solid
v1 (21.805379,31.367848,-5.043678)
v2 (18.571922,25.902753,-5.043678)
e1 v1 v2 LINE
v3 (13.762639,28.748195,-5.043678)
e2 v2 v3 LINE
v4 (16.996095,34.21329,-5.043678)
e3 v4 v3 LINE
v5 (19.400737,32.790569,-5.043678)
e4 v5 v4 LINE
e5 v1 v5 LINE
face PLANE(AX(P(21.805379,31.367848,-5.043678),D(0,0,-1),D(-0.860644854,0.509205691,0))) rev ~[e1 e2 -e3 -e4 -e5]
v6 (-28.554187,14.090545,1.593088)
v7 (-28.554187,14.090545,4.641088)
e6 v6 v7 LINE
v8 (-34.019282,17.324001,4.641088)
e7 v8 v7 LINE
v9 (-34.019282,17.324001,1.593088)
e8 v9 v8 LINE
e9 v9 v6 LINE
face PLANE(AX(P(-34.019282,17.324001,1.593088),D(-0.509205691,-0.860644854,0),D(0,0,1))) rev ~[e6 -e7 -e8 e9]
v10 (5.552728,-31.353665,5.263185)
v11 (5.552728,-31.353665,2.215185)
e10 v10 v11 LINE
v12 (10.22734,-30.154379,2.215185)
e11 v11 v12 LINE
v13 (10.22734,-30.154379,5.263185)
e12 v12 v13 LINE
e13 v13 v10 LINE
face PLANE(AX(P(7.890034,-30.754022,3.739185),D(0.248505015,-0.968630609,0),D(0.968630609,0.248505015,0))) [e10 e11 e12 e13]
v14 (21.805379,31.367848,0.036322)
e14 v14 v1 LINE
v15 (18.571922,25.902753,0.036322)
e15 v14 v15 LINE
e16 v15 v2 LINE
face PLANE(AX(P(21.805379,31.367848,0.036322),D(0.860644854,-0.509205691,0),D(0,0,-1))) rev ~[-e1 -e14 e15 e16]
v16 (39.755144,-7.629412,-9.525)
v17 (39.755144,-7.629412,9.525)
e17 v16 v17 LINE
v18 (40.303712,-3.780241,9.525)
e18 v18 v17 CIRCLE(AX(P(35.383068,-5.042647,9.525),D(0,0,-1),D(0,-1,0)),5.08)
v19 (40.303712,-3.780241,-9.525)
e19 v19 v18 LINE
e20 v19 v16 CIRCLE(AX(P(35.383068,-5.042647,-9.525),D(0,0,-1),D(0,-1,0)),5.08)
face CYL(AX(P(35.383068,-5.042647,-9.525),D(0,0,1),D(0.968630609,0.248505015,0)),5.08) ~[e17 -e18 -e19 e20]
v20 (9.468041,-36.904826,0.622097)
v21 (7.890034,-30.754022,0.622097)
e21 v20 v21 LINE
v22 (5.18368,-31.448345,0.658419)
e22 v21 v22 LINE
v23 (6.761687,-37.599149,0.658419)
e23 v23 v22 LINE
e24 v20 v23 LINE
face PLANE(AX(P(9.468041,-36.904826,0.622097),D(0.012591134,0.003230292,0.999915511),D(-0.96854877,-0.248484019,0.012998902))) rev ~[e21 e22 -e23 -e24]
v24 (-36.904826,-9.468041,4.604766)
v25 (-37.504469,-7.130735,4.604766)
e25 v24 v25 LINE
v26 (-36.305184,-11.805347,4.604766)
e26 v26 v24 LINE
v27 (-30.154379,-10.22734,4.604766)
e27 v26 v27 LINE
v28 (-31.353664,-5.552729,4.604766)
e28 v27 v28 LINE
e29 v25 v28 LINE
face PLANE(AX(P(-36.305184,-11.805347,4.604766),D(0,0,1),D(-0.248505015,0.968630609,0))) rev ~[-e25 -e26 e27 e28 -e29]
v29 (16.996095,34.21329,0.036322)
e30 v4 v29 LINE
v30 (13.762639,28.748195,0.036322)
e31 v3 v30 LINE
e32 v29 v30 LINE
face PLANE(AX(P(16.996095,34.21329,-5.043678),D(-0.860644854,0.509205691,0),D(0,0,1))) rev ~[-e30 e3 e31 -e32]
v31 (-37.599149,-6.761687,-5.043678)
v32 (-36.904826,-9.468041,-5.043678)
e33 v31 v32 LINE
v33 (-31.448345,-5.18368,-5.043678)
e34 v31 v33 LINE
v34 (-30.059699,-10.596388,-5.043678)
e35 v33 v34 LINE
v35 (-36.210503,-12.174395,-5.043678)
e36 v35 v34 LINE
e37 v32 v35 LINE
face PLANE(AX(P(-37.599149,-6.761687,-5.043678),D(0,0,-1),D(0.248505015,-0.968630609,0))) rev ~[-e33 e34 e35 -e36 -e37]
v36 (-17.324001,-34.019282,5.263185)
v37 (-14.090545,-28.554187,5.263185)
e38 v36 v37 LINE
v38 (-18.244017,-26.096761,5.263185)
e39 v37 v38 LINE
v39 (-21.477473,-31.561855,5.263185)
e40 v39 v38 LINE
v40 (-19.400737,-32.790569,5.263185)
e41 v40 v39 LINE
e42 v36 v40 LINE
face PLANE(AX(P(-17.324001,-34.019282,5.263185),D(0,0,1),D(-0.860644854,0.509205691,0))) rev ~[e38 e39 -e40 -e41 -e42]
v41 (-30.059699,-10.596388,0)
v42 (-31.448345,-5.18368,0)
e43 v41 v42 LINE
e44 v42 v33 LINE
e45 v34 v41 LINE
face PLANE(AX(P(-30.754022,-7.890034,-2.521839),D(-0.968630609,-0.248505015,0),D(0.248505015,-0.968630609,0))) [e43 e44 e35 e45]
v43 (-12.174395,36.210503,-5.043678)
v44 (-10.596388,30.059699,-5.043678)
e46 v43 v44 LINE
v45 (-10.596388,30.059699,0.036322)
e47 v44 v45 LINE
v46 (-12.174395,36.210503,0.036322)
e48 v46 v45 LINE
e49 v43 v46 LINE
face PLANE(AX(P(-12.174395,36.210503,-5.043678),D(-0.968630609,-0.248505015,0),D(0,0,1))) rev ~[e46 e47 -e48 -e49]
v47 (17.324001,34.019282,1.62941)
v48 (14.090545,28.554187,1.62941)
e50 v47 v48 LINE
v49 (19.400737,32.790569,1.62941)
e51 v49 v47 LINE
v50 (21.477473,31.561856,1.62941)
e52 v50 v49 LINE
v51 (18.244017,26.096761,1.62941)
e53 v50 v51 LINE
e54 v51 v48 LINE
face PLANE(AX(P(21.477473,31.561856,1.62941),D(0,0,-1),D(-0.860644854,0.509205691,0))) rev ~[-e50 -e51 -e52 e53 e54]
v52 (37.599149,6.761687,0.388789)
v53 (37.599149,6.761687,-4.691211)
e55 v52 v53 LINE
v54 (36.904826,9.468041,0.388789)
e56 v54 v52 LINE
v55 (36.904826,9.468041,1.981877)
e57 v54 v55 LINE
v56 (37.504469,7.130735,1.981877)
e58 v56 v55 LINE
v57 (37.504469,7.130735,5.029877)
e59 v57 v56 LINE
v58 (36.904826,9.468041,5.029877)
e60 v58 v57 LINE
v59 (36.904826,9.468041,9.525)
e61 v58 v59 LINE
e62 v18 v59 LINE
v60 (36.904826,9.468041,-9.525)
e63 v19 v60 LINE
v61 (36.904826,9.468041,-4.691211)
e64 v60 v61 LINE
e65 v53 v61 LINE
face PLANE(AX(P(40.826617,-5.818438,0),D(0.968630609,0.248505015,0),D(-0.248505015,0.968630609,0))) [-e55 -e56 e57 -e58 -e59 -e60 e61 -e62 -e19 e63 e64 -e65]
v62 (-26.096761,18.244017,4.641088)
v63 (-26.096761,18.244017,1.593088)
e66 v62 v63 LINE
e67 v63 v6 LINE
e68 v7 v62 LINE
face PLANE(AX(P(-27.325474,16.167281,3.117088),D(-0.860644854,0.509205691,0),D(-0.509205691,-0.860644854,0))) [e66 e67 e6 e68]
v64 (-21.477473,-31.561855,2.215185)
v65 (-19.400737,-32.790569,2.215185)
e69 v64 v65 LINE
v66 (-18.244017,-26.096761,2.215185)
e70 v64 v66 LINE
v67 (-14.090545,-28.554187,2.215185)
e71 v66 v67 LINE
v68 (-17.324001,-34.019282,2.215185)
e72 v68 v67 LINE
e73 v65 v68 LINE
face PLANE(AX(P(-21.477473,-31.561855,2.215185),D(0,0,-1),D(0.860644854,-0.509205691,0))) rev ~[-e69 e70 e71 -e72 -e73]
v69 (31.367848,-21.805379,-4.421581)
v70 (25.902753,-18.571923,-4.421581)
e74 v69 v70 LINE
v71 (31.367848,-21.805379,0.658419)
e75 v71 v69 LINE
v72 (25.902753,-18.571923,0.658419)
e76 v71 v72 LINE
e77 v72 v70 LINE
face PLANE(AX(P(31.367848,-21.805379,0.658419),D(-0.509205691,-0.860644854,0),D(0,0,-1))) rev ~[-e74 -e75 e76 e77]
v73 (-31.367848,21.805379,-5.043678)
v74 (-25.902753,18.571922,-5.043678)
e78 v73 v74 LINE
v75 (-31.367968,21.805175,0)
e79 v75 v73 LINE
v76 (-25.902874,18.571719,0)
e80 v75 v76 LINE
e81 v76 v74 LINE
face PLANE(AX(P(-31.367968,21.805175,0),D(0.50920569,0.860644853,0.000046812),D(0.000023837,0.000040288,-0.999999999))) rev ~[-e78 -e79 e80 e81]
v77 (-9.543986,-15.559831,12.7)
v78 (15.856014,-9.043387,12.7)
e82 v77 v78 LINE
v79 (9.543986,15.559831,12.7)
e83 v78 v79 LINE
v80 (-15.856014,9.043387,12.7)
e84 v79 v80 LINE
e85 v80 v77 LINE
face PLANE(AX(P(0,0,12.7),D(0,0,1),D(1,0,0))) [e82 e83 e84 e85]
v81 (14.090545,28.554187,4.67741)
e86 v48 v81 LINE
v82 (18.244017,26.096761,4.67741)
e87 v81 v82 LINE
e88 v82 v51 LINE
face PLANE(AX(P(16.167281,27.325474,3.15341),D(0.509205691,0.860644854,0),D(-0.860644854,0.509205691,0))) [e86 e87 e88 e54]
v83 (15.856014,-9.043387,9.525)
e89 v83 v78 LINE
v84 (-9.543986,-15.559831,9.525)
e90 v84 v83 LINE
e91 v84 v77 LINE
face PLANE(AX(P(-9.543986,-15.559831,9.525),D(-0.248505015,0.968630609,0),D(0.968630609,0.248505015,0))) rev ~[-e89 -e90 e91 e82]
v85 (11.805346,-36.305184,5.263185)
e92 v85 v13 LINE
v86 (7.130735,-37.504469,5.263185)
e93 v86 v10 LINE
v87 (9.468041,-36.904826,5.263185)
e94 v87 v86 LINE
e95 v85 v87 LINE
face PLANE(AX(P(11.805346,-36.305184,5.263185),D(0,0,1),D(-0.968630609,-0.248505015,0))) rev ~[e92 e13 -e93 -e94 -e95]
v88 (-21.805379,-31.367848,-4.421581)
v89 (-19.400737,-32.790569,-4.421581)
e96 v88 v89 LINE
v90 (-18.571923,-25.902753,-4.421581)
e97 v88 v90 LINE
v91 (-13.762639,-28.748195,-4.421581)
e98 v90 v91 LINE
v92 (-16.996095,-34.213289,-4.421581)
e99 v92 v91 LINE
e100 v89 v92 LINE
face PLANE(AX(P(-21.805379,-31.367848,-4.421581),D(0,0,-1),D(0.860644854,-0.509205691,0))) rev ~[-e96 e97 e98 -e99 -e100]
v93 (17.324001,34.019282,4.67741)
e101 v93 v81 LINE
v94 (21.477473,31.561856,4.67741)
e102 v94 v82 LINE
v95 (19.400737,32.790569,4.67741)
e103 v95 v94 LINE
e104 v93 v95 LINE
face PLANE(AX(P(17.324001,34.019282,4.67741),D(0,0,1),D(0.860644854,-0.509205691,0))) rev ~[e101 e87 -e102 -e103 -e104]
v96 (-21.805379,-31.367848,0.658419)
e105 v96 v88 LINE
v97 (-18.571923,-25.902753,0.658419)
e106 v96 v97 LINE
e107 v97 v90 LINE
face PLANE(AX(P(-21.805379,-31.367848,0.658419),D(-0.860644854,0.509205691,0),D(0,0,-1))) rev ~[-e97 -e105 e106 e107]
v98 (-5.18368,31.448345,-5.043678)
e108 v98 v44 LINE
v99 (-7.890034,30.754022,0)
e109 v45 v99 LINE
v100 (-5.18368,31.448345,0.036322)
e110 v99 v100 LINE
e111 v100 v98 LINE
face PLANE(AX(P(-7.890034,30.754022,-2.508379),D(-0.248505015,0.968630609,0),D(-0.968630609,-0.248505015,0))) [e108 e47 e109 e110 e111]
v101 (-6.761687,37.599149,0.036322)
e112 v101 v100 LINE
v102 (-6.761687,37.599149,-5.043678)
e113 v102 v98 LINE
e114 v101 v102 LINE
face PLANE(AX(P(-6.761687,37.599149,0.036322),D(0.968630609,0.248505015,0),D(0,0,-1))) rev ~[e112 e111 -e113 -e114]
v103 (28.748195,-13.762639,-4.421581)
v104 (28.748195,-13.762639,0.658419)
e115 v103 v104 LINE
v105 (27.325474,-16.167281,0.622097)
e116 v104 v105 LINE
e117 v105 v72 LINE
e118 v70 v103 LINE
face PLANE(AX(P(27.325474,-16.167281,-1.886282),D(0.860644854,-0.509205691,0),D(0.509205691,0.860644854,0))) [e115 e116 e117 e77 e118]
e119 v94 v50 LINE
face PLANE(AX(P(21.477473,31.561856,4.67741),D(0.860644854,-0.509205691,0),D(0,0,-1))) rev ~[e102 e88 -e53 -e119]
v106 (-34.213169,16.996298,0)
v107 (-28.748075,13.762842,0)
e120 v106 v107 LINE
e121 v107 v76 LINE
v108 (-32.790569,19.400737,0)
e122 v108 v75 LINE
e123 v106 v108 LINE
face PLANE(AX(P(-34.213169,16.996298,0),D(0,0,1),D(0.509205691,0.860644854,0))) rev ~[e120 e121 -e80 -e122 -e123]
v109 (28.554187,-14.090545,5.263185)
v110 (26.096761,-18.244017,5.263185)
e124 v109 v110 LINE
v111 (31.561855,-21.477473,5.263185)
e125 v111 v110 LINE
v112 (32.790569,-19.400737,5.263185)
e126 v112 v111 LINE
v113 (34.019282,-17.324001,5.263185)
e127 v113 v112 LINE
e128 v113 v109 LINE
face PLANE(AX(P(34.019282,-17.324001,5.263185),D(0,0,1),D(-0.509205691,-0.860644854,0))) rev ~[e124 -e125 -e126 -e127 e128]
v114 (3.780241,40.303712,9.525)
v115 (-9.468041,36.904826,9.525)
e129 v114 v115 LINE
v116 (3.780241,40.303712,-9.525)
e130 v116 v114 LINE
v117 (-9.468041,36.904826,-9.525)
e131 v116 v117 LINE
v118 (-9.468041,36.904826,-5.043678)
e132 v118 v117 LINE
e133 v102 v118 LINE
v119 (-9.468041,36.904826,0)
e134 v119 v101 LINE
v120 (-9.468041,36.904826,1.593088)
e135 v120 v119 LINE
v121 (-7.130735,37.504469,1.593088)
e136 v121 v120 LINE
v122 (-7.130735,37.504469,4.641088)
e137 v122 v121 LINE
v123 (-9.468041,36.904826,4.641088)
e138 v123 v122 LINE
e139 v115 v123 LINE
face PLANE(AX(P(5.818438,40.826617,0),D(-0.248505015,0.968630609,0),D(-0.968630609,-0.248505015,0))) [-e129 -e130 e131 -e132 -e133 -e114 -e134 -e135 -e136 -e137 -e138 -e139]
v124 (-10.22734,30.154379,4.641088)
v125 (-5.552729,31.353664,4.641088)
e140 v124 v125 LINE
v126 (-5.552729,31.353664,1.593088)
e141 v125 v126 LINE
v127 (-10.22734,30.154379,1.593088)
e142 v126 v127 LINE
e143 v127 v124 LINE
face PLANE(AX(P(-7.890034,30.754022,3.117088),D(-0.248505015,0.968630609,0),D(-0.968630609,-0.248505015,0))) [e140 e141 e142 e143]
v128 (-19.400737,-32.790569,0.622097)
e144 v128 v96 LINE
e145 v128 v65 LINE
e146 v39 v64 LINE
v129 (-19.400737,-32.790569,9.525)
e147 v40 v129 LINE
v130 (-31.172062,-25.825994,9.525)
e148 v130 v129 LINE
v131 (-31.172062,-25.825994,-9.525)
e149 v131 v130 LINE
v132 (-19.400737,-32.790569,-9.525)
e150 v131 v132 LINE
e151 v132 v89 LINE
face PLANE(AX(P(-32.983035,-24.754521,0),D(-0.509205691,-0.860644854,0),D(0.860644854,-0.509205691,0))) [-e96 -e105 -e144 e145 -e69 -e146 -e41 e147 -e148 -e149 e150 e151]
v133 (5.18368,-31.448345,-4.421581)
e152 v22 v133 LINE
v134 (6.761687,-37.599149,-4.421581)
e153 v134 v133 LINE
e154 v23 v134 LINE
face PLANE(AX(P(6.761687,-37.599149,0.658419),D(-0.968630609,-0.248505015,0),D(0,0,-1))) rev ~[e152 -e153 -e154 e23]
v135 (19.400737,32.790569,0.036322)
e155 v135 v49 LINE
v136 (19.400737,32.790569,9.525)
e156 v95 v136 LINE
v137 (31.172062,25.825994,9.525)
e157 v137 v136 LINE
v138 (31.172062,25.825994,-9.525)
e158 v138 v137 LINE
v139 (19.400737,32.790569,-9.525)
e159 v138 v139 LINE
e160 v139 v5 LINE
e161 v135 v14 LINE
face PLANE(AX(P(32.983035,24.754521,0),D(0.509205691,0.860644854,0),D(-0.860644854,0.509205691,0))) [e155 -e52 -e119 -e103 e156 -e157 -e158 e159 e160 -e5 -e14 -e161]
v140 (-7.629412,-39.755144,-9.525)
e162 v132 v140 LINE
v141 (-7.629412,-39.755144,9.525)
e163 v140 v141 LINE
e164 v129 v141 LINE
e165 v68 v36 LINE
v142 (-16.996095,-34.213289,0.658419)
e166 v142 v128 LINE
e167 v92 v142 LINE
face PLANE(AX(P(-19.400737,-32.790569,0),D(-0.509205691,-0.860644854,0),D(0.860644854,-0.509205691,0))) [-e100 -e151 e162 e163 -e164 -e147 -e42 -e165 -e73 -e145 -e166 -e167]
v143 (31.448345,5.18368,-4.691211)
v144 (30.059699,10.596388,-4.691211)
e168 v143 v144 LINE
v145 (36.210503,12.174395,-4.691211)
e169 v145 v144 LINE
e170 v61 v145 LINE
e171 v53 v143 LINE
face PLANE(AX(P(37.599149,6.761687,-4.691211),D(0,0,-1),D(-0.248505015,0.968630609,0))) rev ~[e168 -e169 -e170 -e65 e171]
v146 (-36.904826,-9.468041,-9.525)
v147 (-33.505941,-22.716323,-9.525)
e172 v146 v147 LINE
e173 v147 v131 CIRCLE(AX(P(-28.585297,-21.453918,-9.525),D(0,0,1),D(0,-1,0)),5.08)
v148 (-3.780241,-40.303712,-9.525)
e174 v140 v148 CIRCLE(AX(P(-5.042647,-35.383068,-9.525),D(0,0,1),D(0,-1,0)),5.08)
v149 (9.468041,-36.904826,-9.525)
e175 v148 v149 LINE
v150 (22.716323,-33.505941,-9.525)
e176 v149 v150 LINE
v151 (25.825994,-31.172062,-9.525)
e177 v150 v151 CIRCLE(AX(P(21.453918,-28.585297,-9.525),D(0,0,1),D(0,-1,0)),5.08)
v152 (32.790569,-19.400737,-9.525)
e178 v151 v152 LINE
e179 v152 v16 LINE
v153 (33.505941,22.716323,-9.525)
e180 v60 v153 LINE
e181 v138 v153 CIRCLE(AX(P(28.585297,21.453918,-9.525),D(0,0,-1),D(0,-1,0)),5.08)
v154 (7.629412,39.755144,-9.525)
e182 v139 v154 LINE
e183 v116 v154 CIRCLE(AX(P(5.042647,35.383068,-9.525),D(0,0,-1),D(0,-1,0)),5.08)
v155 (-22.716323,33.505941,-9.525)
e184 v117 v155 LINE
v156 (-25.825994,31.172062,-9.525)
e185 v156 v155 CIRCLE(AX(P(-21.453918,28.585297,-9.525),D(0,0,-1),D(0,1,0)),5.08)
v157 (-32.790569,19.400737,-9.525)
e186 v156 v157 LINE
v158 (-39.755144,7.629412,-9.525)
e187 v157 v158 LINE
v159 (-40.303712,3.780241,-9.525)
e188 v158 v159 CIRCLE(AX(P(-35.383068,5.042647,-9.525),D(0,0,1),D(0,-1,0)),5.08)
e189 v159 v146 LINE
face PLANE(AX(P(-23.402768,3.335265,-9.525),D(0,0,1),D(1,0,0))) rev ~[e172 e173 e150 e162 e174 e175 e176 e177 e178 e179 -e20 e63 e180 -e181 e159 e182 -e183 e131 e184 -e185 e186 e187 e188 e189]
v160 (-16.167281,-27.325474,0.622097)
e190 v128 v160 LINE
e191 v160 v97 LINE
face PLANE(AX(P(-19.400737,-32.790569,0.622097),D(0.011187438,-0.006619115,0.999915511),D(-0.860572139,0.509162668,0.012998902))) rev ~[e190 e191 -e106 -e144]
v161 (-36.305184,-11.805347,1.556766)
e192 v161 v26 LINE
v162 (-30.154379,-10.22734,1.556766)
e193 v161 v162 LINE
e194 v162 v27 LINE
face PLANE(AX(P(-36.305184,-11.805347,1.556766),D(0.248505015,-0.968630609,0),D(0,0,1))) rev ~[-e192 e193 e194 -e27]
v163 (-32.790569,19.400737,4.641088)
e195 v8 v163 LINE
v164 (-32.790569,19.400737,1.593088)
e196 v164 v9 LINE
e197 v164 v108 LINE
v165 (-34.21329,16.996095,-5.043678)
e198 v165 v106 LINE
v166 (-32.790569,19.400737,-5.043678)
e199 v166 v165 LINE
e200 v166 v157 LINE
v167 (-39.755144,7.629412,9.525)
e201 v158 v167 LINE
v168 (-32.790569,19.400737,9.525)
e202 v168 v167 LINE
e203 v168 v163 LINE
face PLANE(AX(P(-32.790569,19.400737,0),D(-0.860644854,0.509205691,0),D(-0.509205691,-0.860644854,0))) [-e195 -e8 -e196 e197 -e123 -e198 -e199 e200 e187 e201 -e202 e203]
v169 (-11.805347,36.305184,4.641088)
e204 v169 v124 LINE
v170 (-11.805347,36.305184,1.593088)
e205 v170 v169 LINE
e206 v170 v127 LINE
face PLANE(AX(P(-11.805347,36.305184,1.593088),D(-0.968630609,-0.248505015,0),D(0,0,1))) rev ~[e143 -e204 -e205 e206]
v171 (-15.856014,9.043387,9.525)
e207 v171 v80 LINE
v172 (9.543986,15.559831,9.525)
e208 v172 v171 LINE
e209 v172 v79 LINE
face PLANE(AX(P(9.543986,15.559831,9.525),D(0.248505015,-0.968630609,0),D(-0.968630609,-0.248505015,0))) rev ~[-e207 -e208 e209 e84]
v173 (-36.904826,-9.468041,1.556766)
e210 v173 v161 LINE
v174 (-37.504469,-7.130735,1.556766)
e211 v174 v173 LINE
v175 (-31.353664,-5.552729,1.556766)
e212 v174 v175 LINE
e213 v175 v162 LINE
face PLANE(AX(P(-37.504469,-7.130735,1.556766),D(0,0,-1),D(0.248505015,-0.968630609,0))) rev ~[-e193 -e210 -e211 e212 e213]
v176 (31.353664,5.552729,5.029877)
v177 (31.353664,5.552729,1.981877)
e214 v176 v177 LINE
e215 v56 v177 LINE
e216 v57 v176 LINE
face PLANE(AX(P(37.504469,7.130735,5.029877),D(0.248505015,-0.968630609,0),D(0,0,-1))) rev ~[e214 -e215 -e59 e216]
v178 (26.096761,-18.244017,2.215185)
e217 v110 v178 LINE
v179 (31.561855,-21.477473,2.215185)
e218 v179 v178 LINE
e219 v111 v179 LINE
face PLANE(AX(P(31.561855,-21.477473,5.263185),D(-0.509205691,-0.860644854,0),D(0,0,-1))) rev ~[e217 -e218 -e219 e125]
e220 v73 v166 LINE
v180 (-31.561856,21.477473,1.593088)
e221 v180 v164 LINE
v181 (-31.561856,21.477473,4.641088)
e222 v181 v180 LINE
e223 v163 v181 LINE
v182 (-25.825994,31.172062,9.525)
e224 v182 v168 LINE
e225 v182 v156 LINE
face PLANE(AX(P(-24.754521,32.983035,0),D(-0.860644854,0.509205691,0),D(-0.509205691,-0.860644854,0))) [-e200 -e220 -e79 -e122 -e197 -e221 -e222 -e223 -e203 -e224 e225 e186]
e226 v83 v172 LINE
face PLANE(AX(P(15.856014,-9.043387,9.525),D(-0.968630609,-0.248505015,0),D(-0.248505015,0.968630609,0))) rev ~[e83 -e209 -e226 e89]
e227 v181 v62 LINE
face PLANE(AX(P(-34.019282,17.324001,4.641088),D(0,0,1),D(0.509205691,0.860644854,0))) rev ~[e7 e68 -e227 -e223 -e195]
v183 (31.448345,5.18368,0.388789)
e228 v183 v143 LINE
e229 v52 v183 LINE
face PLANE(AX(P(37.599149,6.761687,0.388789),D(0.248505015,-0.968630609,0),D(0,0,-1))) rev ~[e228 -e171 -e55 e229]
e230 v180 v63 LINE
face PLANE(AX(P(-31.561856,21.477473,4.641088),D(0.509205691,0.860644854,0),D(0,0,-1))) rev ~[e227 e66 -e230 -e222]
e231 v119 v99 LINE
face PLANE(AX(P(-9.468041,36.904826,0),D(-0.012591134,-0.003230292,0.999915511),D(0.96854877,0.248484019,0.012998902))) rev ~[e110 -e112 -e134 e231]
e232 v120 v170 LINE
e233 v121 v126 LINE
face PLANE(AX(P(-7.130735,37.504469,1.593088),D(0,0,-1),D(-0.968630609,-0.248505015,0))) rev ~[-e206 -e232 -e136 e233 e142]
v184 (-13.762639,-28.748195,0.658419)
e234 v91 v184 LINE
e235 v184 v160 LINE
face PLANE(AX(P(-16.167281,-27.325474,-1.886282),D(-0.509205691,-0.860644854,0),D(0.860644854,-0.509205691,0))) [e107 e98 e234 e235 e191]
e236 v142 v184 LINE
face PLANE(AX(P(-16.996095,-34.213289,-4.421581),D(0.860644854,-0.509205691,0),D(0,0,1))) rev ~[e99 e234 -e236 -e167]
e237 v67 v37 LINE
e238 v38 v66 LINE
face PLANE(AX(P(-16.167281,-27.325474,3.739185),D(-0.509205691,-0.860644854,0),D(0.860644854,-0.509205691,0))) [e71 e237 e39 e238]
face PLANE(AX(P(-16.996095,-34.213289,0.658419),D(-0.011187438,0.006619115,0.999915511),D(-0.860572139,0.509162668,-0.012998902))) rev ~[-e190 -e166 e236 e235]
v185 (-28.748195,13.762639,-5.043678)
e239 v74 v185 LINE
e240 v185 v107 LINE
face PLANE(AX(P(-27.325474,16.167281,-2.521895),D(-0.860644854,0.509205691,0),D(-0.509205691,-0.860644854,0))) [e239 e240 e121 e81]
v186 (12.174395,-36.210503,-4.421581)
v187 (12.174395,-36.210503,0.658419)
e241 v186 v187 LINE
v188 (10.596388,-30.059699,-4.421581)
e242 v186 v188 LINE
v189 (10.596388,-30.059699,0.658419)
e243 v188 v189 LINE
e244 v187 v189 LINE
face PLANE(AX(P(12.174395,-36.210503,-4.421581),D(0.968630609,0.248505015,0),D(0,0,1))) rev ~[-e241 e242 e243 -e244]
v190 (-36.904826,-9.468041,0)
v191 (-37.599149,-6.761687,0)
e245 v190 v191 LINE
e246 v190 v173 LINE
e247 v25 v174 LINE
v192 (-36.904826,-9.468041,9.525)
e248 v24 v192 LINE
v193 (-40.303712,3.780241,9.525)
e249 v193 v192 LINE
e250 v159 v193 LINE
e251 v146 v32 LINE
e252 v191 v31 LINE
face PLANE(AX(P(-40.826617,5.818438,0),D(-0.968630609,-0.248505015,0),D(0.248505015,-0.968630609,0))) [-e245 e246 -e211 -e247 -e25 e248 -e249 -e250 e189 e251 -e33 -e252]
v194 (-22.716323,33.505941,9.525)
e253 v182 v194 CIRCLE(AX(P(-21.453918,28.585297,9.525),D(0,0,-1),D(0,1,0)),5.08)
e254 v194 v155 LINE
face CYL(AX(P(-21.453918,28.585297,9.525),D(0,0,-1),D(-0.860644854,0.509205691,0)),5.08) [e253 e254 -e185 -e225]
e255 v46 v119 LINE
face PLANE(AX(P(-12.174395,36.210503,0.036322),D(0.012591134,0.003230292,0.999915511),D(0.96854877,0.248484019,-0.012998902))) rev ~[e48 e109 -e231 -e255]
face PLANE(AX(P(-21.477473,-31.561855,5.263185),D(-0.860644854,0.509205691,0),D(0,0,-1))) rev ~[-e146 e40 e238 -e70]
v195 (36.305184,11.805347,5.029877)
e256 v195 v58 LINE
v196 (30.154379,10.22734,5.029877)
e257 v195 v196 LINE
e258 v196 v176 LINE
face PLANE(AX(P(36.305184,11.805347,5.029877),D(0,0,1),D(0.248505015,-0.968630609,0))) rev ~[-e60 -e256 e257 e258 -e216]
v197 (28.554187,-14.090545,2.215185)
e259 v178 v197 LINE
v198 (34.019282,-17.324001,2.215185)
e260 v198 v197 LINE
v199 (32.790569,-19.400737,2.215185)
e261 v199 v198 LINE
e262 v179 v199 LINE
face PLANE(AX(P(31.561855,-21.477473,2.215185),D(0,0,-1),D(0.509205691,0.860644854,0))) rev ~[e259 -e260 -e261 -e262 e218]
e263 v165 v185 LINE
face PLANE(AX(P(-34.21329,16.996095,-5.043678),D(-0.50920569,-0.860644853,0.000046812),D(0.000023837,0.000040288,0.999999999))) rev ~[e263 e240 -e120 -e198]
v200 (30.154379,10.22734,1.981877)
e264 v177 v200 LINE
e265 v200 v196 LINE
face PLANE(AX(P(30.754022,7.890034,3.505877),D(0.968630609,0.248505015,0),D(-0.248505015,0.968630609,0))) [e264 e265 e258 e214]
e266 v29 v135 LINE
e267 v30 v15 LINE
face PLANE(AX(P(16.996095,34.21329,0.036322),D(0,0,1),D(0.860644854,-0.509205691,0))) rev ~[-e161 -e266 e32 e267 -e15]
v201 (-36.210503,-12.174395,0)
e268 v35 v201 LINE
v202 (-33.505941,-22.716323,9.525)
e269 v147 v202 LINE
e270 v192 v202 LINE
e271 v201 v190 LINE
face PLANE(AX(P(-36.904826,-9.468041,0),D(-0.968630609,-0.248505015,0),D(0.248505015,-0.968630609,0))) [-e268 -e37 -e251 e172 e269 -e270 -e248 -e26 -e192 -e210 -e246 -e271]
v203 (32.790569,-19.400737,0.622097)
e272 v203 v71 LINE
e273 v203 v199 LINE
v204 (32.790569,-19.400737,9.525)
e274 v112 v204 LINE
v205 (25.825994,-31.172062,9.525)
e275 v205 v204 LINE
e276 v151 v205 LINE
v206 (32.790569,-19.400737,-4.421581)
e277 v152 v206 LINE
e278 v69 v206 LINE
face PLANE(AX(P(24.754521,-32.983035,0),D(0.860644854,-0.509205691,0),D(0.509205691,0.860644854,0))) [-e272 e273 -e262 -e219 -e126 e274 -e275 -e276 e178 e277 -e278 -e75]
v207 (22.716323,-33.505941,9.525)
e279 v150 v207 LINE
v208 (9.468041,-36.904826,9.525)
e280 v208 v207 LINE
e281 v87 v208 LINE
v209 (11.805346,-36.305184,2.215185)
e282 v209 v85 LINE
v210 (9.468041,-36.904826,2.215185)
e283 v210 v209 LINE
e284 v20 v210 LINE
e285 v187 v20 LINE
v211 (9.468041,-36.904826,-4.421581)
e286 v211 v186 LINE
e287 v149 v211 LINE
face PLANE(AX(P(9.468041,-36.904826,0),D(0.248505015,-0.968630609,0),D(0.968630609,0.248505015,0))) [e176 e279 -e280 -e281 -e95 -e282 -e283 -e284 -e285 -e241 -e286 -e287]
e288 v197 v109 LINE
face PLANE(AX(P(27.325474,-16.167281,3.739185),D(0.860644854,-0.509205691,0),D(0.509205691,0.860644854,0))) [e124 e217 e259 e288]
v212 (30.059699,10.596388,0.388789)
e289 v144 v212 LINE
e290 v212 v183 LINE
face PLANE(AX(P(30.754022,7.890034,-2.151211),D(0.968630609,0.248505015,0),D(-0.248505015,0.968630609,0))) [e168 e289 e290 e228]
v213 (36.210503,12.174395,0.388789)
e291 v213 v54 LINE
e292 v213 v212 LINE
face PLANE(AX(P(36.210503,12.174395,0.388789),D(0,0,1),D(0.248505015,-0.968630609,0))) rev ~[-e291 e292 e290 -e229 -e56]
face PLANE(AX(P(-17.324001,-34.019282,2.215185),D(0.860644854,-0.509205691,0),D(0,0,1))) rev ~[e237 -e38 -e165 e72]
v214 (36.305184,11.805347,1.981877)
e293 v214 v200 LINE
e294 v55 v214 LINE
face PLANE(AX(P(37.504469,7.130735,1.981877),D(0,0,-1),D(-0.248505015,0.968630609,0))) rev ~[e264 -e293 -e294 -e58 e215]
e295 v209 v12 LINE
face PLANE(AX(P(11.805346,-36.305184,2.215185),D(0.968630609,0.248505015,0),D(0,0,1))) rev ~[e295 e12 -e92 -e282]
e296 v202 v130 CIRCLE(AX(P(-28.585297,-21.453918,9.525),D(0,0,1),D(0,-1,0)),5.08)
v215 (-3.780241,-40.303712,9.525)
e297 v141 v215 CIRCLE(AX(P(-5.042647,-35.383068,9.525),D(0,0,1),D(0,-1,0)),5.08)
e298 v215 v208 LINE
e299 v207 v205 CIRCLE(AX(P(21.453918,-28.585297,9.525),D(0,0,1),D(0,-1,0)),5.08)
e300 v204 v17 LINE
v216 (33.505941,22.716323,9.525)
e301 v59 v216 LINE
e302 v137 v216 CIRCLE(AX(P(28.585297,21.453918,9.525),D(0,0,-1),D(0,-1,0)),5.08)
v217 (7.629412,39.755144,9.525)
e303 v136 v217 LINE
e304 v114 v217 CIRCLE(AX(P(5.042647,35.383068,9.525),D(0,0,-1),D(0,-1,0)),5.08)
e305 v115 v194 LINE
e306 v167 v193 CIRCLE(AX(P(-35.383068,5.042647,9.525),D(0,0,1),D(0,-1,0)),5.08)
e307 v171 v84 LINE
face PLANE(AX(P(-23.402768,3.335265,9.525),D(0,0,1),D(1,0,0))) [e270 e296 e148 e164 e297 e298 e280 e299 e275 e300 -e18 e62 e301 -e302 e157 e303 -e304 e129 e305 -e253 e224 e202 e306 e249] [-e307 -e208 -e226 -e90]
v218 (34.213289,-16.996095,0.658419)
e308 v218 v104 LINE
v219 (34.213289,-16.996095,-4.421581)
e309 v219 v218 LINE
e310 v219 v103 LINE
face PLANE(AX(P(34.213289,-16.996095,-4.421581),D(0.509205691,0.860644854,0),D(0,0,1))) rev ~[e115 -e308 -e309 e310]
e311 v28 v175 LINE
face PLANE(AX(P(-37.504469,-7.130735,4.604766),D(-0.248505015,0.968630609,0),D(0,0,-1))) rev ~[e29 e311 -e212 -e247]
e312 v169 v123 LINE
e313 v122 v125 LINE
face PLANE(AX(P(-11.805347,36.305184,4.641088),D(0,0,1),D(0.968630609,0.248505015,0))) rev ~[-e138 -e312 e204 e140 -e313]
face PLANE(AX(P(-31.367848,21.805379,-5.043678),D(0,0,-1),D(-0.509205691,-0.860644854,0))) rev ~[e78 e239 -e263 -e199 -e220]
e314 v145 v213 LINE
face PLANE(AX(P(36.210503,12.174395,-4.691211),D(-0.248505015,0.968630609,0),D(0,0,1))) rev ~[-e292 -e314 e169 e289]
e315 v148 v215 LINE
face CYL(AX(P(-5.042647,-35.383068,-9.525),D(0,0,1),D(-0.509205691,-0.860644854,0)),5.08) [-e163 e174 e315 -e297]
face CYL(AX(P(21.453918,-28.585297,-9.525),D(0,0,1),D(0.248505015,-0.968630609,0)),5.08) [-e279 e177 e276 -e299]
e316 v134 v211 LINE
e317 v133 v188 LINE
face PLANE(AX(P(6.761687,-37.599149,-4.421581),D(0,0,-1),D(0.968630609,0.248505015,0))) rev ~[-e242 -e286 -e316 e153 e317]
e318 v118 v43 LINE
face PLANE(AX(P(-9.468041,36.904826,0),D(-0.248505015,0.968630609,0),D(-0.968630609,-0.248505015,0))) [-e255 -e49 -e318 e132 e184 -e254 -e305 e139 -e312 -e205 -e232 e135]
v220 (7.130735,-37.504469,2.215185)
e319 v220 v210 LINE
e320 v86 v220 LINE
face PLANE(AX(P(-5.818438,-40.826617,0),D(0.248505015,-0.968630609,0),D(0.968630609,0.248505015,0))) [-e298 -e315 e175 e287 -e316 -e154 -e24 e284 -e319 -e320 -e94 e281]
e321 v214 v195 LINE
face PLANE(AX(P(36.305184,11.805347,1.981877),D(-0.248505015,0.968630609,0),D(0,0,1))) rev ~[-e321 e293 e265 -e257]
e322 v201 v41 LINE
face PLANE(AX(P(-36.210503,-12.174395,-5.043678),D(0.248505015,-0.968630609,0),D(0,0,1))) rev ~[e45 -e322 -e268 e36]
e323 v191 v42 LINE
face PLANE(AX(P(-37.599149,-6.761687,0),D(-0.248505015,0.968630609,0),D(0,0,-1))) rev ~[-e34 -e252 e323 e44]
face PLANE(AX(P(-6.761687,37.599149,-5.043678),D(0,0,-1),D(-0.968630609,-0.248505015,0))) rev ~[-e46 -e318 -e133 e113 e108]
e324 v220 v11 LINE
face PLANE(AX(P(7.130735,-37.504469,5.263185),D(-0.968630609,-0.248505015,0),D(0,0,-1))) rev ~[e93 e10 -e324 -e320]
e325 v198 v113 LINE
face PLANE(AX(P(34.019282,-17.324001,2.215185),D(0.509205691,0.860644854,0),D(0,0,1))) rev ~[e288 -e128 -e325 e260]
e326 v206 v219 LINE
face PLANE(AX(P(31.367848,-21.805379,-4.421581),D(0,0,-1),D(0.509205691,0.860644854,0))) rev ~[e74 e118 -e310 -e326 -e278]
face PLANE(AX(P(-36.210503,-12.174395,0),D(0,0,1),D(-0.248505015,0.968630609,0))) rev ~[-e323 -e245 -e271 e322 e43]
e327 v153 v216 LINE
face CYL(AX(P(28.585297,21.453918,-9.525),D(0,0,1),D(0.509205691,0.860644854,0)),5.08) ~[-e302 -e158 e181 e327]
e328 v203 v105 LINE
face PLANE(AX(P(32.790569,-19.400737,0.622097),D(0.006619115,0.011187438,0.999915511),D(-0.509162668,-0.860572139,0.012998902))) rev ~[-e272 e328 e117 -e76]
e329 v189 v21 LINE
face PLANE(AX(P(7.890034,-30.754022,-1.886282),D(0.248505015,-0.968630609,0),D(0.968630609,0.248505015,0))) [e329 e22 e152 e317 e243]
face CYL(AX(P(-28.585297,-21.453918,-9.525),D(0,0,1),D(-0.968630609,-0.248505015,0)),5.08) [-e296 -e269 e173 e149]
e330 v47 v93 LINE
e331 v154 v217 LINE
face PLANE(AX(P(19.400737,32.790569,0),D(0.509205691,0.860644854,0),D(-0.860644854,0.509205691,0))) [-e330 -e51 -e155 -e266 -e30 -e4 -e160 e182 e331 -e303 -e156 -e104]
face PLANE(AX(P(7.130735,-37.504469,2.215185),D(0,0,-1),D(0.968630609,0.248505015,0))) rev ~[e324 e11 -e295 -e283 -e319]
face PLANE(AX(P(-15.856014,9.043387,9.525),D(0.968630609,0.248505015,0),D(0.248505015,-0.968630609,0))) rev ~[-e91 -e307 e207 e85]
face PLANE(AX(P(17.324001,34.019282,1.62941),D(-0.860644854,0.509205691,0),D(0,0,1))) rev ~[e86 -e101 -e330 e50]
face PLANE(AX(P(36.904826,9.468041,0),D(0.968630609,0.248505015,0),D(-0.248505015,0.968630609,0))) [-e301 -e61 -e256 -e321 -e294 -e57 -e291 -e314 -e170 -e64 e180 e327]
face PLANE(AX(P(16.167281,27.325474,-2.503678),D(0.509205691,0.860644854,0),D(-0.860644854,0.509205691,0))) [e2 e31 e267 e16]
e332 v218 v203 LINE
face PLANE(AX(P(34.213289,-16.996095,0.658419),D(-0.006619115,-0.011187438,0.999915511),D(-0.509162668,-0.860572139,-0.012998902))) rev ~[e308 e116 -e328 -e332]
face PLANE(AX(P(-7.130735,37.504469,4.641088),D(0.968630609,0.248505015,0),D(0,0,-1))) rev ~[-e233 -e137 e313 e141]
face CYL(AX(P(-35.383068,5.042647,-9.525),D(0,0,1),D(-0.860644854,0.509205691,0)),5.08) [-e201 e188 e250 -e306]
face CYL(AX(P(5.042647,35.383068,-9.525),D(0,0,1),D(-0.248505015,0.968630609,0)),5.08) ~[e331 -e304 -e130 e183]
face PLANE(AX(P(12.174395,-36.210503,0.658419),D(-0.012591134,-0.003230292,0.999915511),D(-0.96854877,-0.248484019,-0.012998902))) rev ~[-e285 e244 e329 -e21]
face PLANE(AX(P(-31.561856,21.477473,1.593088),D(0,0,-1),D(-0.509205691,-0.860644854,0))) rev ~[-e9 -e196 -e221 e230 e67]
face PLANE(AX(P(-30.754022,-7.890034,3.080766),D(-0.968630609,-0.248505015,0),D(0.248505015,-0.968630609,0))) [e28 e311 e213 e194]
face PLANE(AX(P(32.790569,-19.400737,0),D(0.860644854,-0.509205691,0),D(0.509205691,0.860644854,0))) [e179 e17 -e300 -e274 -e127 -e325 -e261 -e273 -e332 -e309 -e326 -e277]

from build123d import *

# Parameters (mm, degrees)
F1_DEPTH  = 9.525
F3_DEPTH  = 6.35
F5_DEPTH  = 6.35
F7_DEPTH  = 6.35
F9_DEPTH  = 6.35
F11_DEPTH = 6.35
F13_DEPTH = 6.35
F15_DEPTH = 6.35
F17_DEPTH = 6.35
F19_DEPTH = 3.175
F20_R     = 5.08


# Not quite as in the source:
# - a feature names something its author has since deleted; it is built from what else it names


with BuildPart() as f1:
    # F0 (on Top) → F1 (new body, symmetric)
    with BuildSketch(Plane.XY):
        Polygon((-32.7905689314, 19.40073682), (-40.8266172422, 5.8184384507), (-36.9048262157, -9.4680410849), (0, 0), align=None)
        Polygon((-24.7545206205, 32.9830351893), (-32.7905689314, 19.40073682), (0, 0), (-9.4680410849, 36.9048262157), align=None)
        Polygon((-9.4680410849, 36.9048262157), (0, 0), (19.40073682, 32.7905689314), (5.8184384507, 40.8266172422), align=None)
        Polygon((19.40073682, 32.7905689314), (0, 0), (36.9048262157, 9.4680410849), (32.9830351893, 24.7545206205), align=None)
        Polygon((36.9048262157, 9.4680410849), (0, 0), (32.7905689314, -19.40073682), (40.8266172422, -5.8184384507), align=None)
        Polygon((32.7905689314, -19.40073682), (0, 0), (9.4680410849, -36.9048262157), (24.7545206205, -32.9830351893), align=None)
        Polygon((9.4680410849, -36.9048262157), (0, 0), (-19.40073682, -32.7905689314), (-5.8184384507, -40.8266172422), align=None)
        Polygon((0, 0), (-36.9048262157, -9.4680410849), (-32.9830351893, -24.7545206205), (-19.40073682, -32.7905689314), align=None)
    extrude(amount=F1_DEPTH, both=True)

    # F2 (on face) → F3 (cut)
    with BuildSketch(Plane(origin=(-36.9048262157, -9.4680410849, 0), x_dir=(0.2485050154, -0.9686306093, 0), z_dir=(-0.9686306093, -0.2485050154, 0))):
        Polygon((-2.794, 0), (-2.794, -2.521839), (-2.794, -5.043678), (2.794, -5.043678), (2.794, -2.521839), (2.794, 0), align=None)
        Polygon((-2.413, 1.556766), (0, 1.556766), (2.413, 1.556766), (2.413, 4.604766), (-2.413, 4.604766), align=None)
    extrude(amount=-F3_DEPTH, mode=Mode.SUBTRACT)

    # F4 (on face) → F5 (cut)
    with BuildSketch(Plane(origin=(-9.4680410849, 36.9048262157, 0), x_dir=(-0.9686306093, -0.2485050154, 0), z_dir=(-0.2485050154, 0.9686306093, 0))):
        Polygon((-2.794, -5.043678), (0, -5.043678), (2.794, -5.043678), (2.794, 0.036322), (0, 0), (-2.794, 0.036322), align=None)
        Polygon((-2.413, 1.593088), (0, 1.593088), (2.413, 1.593088), (2.413, 4.641088), (0, 4.641088), (-2.413, 4.641088), align=None)
    extrude(amount=-F5_DEPTH, mode=Mode.SUBTRACT)

    # F6 (on face) → F7 (cut)
    with BuildSketch(Plane(origin=(-32.7905689314, 19.40073682, 0), x_dir=(-0.5092056908, -0.8606448538, 0), z_dir=(-0.8606448538, 0.5092056908, 0))):
        Polygon((-2.413, 1.593088), (0, 1.593088), (2.413, 1.593088), (2.413, 4.641088), (0, 4.641088), (-2.413, 4.641088), align=None)
        Polygon((-2.794, -5.043678), (0, -5.043678), (2.794, -5.043678), (2.793763897, 0), (-2.793763897, 0), align=None)
    extrude(amount=-F7_DEPTH, mode=Mode.SUBTRACT)

    # F8 (on face) → F9 (cut)
    with BuildSketch(Plane(origin=(19.40073682, 32.7905689314, 0), x_dir=(-0.8606448538, 0.5092056908, 0), z_dir=(0.5092056908, 0.8606448538, 0))):
        Polygon((-2.413, 1.62941), (0, 1.62941), (2.413, 1.62941), (2.413, 4.67741), (-2.413, 4.67741), align=None)
        Polygon((-2.794, -5.043678), (0, -5.043678), (2.794, -5.043678), (2.794, 0.036322), (-2.794, 0.036322), align=None)
    extrude(amount=-F9_DEPTH, mode=Mode.SUBTRACT)

    # F10 (on face) → F11 (cut)
    with BuildSketch(Plane(origin=(36.9048262157, 9.4680410849, 0), x_dir=(-0.2485050154, 0.9686306093, 0), z_dir=(0.9686306093, 0.2485050154, 0))):
        Polygon((-2.794, -4.6912106667), (0, -4.6912106667), (2.794, -4.6912106667), (2.794, 0.3887893333), (-2.794, 0.3887893333), align=None)
        Polygon((-2.413, 1.9818773333), (0, 1.9818773333), (2.413, 1.9818773333), (2.413, 5.0298773333), (-2.413, 5.0298773333), align=None)
    extrude(amount=-F11_DEPTH, mode=Mode.SUBTRACT)

    # F12 (on face) → F13 (cut)
    with BuildSketch(Plane(origin=(32.7905689314, -19.40073682, 0), x_dir=(0.5092056908, 0.8606448538, 0), z_dir=(0.8606448538, -0.5092056908, 0))):
        Polygon((-2.7940002649, -4.4215812), (-2.649e-07, -4.4215812), (2.7939997351, -4.4215812), (2.7939997351, 0.6584188), (-2.649e-07, 0.6220968), (-2.7940002649, 0.6584188), align=None)
        Polygon((-2.4130002649, 2.2151848), (-2.649e-07, 2.2151848), (2.4129997351, 2.2151848), (2.4129997351, 5.2631848), (-2.649e-07, 5.2631848), (-2.4130002649, 5.2631848), align=None)
    extrude(amount=-F13_DEPTH, mode=Mode.SUBTRACT)

    # F14 (on face) → F15 (cut)
    with BuildSketch(Plane(origin=(9.4680410849, -36.9048262157, 0), x_dir=(0.9686306093, 0.2485050154, 0), z_dir=(0.2485050154, -0.9686306093, 0))):
        Polygon((-2.7940002649, -4.4215812), (-2.649e-07, -4.4215812), (2.7939997351, -4.4215812), (2.7939997351, 0.6584188), (-2.649e-07, 0.6220968), (-2.7940002649, 0.6584188), align=None)
        Polygon((-2.4130002649, 2.2151848), (-2.649e-07, 2.2151848), (2.4129997351, 2.2151848), (2.4129997351, 5.2631848), (-2.649e-07, 5.2631848), (-2.4130002649, 5.2631848), align=None)
    extrude(amount=-F15_DEPTH, mode=Mode.SUBTRACT)

    # F16 (on face) → F17 (cut)
    with BuildSketch(Plane(origin=(-19.40073682, -32.7905689314, 0), x_dir=(0.8606448538, -0.5092056908, 0), z_dir=(-0.5092056908, -0.8606448538, 0))):
        Polygon((-2.4130002649, 2.2151848), (-2.649e-07, 2.2151848), (2.4129997351, 2.2151848), (2.4129997351, 5.2631848), (-2.649e-07, 5.2631848), (-2.4130002649, 5.2631848), align=None)
        Polygon((-2.7940002649, -4.4215812), (-2.649e-07, -4.4215812), (2.7939997351, -4.4215812), (2.7939997351, 0.6584188), (-2.649e-07, 0.6220968), (-2.7940002649, 0.6584188), align=None)
    extrude(amount=-F17_DEPTH, mode=Mode.SUBTRACT)

    # F18 (on face) → F19 (join)
    with BuildSketch(Plane.XY.offset(9.525)):
        Polygon((-3.156013695, 12.3016087386), (-15.856013695, 9.0433866005), (-9.543986305, -15.5598308767), (3.156013695, -12.3016087386), (15.856013695, -9.0433866005), (9.543986305, 15.5598308767), align=None)
    extrude(amount=F19_DEPTH)

    # F20
    f20_edges = [f1.edges().sort_by_distance(p)[0] for p in [
        (-5.818438, -40.826617, 0),
        (24.754521, -32.983035, 0),
        (40.826617, -5.818438, 0),
        (32.983035, 24.754521, 0),
        (5.818438, 40.826617, 0),
        (-24.754521, 32.983035, 0),
        (-40.826617, 5.818438, 0),
        (-32.983035, -24.754521, 0),
    ]]
    fillet(f20_edges, radius=F20_R)


solid = f1.part
